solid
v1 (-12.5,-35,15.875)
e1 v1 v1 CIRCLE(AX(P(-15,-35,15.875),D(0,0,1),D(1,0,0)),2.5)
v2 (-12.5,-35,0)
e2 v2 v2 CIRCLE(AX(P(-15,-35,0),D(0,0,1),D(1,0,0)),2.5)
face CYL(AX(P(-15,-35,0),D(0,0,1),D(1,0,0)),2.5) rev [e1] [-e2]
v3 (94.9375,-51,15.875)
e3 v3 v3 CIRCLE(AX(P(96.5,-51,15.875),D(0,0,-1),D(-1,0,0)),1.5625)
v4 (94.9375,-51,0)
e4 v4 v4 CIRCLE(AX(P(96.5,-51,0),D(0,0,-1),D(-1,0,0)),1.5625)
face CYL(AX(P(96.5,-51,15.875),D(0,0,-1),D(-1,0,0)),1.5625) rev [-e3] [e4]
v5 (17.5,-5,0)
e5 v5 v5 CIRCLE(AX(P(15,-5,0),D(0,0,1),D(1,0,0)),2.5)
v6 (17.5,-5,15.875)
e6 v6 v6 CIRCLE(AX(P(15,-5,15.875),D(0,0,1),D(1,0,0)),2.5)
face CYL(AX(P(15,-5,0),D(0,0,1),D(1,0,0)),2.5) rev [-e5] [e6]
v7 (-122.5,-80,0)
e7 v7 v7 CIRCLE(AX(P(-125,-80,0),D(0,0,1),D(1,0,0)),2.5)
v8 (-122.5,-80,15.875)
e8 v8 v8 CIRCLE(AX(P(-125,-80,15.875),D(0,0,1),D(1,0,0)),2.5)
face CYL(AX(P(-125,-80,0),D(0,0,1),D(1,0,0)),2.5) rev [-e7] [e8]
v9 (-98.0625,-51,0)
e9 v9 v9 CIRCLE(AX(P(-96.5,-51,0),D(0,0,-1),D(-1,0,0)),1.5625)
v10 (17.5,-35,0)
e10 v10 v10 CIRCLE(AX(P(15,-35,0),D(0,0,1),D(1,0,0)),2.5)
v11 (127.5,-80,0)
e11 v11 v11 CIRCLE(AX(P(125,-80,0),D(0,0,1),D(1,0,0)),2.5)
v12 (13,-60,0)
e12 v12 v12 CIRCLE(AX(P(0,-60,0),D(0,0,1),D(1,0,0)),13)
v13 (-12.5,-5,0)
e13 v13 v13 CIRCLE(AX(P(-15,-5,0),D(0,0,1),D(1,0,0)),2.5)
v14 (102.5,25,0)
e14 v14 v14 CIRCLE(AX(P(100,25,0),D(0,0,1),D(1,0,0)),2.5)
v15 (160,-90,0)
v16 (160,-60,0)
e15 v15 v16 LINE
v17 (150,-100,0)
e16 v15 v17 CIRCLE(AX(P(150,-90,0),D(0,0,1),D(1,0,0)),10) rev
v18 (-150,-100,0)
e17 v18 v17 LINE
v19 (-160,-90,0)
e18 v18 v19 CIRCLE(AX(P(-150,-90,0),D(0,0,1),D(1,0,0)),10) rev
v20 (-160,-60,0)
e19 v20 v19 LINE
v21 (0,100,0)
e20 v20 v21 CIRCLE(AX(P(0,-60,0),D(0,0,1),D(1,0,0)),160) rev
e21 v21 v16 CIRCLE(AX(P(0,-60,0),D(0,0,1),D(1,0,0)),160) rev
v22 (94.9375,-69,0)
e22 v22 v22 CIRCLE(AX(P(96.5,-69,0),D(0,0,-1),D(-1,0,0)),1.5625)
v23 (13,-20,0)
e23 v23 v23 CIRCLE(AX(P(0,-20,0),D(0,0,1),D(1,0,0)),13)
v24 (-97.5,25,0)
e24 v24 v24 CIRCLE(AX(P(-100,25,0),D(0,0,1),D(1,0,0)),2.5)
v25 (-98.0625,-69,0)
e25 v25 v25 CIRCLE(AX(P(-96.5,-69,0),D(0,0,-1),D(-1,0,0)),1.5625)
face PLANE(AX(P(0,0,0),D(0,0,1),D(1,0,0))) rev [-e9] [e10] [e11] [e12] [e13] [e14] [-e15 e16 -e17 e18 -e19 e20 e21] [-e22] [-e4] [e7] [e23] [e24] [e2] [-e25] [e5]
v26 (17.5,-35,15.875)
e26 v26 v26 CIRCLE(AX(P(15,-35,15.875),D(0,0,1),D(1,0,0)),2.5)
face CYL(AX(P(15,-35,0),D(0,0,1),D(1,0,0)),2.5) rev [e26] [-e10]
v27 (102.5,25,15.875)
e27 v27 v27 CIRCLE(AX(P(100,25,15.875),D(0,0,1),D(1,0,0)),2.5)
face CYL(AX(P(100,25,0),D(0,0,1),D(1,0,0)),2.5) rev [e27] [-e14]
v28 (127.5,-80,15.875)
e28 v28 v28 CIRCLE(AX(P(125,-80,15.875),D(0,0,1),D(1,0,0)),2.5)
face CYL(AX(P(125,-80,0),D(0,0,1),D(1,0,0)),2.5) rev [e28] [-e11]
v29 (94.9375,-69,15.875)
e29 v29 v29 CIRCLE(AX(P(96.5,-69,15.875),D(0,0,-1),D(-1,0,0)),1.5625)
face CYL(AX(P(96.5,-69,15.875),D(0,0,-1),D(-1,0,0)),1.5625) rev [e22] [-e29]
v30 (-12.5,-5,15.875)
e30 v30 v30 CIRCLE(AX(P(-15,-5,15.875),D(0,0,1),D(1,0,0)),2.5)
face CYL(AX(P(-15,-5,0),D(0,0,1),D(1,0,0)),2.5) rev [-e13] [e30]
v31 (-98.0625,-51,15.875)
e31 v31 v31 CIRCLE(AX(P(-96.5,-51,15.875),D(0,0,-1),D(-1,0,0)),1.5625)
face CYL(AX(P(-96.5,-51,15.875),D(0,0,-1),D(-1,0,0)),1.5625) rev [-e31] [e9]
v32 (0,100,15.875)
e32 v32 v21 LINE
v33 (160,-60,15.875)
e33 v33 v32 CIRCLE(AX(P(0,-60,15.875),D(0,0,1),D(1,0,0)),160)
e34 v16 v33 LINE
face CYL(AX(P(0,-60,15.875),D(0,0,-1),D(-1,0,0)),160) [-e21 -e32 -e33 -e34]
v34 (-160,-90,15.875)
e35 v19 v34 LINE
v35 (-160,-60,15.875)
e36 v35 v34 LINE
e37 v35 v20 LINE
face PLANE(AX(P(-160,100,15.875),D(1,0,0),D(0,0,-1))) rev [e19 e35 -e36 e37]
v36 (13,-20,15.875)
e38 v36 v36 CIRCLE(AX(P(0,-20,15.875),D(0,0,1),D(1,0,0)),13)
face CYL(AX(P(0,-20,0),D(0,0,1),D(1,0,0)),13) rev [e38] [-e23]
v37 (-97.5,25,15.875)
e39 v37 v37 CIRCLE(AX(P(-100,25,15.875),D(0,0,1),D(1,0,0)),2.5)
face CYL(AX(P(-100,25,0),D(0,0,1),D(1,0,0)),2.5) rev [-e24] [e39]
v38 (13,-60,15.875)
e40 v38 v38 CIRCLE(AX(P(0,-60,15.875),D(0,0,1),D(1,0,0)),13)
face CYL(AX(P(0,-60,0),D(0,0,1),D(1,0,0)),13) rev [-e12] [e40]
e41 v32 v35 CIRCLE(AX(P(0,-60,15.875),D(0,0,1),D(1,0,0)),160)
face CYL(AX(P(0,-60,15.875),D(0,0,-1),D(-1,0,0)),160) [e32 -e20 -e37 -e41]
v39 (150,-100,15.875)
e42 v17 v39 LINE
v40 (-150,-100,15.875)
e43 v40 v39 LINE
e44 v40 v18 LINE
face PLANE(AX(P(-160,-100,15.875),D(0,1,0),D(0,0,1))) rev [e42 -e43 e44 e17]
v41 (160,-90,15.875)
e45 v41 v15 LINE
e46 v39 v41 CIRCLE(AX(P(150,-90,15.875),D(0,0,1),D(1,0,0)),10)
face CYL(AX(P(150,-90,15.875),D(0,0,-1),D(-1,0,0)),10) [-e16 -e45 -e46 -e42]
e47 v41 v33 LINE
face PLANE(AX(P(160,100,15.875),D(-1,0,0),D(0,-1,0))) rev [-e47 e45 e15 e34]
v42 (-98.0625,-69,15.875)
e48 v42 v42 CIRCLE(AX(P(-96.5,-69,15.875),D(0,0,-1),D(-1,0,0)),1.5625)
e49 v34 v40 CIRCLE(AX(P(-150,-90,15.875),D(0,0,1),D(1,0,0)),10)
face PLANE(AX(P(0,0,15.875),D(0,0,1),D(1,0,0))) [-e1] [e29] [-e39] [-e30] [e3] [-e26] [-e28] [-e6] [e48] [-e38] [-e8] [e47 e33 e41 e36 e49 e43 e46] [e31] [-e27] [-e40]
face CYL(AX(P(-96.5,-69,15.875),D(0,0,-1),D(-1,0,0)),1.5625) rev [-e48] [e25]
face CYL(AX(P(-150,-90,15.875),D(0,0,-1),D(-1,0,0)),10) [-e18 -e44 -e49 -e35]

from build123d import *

# Parameters (mm, degrees)
SKETCH1_W           = 320
SKETCH1_H           = 200
BOSS_EXTRUDE1_DEPTH = 15.875
FILLET1_R           = 160
FILLET2_R           = 10
SKETCH2_R           = 13
CUT_EXTRUDE1_DEPTH  = 190.346284952
SKETCH3_R           = 2.5
CUT_EXTRUDE2_DEPTH  = 190.346284952
SKETCH4_R           = 2.5
CUT_EXTRUDE3_DEPTH  = 190.346284952
SKETCH5_R           = 1.5625
CUT_EXTRUDE4_DEPTH  = 190.346284952


with BuildPart() as part:
    # Sketch1 → Boss-Extrude1 (new body)
    with BuildSketch(Plane.XY):
        Rectangle(SKETCH1_W, SKETCH1_H)
    extrude(amount=BOSS_EXTRUDE1_DEPTH)

    # Fillet1
    fillet1_edges = [part.edges().sort_by_distance(p)[0] for p in [
        (-160, 100, 7.9375),
        (160, 100, 7.9375),
    ]]
    fillet(fillet1_edges, radius=FILLET1_R - 0.0001)  # a hair under: the kernel refuses the full size

    # Fillet2
    fillet2_edges = [part.edges().sort_by_distance(p)[0] for p in [
        (160, -100, 7.9375),
        (-160, -100, 7.9375),
    ]]
    fillet(fillet2_edges, radius=FILLET2_R)

    # Sketch2 → Cut-Extrude1 (cut, through all)
    with BuildSketch(Plane.XY.offset(15.875)):
        with Locations((0, -60)):
            Circle(SKETCH2_R)
        with Locations((0, -20)):
            Circle(SKETCH2_R)
    extrude(amount=-CUT_EXTRUDE1_DEPTH, mode=Mode.SUBTRACT)

    # Sketch3 → Cut-Extrude2 (cut, through all)
    with BuildSketch(Plane.XY.offset(15.875)):
        with Locations((-15, -5)):
            Circle(SKETCH3_R)
        with Locations((-15, -35)):
            Circle(SKETCH3_R)
        with Locations((15, -35)):
            Circle(SKETCH3_R)
        with Locations((15, -5)):
            Circle(SKETCH3_R)
    extrude(amount=-CUT_EXTRUDE2_DEPTH, mode=Mode.SUBTRACT)

    # Sketch4 → Cut-Extrude3 (cut, through all)
    with BuildSketch(Plane.XY.offset(15.875)):
        with Locations((-100, 25)):
            Circle(SKETCH4_R)
        with Locations((100, 25)):
            Circle(SKETCH4_R)
        with Locations((125, -80)):
            Circle(SKETCH4_R)
        with Locations((-125, -80)):
            Circle(SKETCH4_R)
    extrude(amount=-CUT_EXTRUDE3_DEPTH, mode=Mode.SUBTRACT)

    # Sketch5 → Cut-Extrude4 (cut, through all)
    with BuildSketch(Plane(origin=(0, 0, 0), x_dir=(-1, 0, 0), z_dir=(0, 0, -1))):
        with Locations((96.5, -51)):
            Circle(SKETCH5_R)
        with Locations((96.5, -69)):
            Circle(SKETCH5_R)
        with Locations((-96.5, -51)):
            Circle(SKETCH5_R)
        with Locations((-96.5, -69)):
            Circle(SKETCH5_R)
    extrude(amount=-CUT_EXTRUDE4_DEPTH, mode=Mode.SUBTRACT)


solid = part.part
